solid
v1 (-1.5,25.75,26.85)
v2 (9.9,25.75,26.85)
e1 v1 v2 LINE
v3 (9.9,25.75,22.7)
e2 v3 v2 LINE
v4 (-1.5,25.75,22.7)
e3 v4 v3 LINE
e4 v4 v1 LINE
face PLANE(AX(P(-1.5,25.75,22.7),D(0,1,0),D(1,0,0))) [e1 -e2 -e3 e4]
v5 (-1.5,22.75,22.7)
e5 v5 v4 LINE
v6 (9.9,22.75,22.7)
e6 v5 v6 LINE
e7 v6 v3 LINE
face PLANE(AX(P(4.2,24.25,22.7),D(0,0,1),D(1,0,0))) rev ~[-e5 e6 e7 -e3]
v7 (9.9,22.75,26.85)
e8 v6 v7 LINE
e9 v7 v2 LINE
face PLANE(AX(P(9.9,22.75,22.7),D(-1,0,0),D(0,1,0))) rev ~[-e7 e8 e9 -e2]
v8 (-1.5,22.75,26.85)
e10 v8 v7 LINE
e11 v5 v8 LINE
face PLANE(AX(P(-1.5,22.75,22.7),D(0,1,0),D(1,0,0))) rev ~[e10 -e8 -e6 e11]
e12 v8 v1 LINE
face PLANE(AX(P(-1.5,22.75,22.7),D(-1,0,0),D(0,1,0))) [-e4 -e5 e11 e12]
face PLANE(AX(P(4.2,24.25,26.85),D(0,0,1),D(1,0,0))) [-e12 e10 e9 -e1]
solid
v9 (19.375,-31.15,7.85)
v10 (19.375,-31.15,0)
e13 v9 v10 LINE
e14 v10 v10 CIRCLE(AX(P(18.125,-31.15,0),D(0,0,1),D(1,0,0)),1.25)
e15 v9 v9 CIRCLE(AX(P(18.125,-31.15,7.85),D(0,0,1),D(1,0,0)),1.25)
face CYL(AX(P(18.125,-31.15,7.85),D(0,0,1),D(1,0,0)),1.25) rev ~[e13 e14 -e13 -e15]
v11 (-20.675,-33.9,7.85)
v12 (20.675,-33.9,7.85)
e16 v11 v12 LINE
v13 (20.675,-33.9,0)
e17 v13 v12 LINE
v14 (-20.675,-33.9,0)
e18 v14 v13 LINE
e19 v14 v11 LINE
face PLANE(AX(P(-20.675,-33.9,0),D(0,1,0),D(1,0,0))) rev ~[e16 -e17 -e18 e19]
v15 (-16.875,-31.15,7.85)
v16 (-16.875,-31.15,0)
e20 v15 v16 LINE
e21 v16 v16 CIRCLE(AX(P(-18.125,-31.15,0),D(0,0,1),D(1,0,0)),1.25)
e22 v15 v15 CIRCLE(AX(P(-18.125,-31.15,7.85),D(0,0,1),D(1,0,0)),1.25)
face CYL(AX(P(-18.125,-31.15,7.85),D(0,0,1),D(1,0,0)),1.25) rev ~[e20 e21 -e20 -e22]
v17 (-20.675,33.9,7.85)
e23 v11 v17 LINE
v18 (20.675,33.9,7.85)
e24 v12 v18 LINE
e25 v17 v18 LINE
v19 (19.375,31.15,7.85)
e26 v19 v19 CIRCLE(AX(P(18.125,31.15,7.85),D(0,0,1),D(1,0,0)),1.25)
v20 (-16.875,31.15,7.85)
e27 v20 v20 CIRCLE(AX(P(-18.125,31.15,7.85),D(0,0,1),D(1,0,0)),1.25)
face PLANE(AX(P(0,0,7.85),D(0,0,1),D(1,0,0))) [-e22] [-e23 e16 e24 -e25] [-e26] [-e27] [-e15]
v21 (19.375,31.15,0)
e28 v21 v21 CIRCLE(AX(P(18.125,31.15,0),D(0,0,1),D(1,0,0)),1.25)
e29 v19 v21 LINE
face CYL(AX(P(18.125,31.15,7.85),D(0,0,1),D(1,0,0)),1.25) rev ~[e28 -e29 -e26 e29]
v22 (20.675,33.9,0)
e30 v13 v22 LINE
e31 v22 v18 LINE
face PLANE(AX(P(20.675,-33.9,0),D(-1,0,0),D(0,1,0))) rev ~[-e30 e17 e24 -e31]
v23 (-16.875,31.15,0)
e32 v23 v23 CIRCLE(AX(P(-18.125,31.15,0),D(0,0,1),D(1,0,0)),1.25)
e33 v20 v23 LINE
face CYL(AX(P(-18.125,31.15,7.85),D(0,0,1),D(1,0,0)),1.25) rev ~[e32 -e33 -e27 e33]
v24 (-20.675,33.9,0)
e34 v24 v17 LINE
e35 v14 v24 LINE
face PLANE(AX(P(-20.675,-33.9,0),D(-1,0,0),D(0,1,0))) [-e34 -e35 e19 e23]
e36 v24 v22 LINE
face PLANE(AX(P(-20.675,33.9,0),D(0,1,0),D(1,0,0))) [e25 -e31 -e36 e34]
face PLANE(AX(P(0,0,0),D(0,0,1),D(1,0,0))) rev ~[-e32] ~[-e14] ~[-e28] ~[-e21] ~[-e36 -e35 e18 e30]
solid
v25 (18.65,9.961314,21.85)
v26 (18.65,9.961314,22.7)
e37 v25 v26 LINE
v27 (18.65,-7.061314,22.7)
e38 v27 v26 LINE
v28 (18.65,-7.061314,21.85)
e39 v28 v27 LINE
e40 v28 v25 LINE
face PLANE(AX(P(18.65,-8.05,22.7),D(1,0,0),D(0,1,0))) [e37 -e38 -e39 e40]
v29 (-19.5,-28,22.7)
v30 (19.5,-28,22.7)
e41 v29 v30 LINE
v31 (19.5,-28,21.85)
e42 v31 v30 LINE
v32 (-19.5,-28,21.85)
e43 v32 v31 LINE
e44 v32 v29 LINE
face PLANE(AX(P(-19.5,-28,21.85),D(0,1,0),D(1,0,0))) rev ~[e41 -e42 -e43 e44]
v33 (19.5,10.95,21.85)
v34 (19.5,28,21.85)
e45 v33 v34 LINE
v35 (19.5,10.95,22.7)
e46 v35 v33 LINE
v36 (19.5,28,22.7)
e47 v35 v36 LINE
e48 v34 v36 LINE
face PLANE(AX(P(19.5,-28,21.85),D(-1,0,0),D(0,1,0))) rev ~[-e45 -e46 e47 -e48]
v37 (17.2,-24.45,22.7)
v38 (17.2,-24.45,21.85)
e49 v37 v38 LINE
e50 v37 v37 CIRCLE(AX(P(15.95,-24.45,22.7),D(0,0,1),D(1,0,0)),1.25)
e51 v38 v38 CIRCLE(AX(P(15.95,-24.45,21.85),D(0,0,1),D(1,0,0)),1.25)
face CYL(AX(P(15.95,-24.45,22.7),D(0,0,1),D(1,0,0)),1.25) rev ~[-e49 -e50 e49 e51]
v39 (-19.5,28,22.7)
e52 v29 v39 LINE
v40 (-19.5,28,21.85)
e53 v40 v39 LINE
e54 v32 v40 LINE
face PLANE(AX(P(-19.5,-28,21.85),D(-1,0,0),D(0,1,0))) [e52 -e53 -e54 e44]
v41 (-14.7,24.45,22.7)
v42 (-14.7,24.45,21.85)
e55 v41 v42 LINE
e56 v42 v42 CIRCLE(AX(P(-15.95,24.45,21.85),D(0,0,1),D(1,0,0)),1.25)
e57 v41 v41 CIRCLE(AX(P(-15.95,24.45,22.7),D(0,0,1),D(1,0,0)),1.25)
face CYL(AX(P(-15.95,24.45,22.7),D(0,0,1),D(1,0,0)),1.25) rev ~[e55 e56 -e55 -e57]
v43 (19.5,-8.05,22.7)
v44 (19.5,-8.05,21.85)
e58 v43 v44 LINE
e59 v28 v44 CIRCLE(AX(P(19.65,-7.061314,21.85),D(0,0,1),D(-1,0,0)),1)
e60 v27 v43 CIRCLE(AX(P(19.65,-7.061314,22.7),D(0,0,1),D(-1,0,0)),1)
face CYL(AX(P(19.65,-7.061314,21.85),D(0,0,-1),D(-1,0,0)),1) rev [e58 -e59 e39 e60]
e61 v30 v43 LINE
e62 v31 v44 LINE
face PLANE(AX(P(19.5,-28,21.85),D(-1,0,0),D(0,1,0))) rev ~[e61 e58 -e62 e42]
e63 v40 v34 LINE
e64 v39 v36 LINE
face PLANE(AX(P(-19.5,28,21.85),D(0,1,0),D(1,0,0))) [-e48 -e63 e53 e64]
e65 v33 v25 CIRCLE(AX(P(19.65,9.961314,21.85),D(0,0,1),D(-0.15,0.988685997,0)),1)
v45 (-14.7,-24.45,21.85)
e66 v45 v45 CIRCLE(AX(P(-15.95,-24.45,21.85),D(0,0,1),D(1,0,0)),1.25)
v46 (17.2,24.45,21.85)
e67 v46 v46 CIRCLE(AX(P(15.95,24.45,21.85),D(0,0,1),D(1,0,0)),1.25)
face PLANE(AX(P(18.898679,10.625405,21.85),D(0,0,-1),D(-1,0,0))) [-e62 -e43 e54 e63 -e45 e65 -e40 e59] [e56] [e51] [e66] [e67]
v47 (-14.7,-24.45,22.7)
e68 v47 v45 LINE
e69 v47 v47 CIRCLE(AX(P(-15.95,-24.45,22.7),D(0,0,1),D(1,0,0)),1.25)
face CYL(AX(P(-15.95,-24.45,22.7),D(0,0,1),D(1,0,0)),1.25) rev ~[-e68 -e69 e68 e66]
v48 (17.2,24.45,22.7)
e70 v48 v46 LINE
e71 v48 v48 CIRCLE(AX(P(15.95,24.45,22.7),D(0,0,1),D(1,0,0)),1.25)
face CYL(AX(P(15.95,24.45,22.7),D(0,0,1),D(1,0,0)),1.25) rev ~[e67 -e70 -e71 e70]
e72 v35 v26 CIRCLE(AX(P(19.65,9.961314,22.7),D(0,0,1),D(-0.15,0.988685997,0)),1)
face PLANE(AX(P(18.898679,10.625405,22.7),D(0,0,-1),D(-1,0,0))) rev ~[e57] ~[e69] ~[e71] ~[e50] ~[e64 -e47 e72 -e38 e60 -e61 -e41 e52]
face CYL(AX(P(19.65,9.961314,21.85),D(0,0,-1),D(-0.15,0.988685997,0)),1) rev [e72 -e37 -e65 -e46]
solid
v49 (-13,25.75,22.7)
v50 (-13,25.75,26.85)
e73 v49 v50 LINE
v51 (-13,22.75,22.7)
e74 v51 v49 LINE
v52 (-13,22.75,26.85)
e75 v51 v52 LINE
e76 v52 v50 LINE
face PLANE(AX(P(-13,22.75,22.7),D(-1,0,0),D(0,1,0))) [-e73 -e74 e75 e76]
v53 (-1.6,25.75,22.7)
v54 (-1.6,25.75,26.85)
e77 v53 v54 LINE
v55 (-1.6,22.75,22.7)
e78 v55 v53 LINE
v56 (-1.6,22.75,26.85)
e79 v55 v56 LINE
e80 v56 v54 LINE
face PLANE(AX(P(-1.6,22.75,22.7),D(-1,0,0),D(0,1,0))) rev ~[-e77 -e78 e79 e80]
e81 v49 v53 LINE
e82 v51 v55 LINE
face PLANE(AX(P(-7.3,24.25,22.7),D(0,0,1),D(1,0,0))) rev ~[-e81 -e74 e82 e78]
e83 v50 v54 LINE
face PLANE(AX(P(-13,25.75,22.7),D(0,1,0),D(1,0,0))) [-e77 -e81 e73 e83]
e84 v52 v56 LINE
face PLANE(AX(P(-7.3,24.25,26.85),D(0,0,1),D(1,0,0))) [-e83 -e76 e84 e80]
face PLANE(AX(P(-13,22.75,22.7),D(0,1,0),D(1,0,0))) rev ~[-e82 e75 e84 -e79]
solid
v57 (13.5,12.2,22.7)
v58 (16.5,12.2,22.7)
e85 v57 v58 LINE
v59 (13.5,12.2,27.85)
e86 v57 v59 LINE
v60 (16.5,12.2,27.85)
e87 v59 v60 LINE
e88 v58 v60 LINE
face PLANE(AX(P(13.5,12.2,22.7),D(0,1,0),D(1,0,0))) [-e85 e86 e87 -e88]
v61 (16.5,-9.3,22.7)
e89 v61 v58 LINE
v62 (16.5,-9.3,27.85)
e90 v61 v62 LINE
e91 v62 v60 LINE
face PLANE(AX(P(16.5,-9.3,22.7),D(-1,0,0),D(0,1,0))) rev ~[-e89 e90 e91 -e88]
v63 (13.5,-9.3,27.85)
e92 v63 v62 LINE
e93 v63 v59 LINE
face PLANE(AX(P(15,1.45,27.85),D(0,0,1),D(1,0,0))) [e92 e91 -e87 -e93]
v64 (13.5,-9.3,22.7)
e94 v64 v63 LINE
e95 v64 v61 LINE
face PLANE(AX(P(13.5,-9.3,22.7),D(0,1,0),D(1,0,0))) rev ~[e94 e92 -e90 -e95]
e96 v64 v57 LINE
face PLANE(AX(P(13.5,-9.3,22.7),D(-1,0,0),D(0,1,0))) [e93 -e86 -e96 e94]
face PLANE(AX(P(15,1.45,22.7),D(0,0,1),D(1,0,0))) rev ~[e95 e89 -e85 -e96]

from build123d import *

# Parameters (mm, degrees)
F0_W         = 41.35
F0_H         = 67.8
F1_DEPTH     = 7.85
F2_R         = 1.25
F3_DEPTH     = 7.851
F5_W         = 39
F5_H         = 56
F6_DEPTH     = 0.85
F7_R         = 1.25
F8_DEPTH     = 22.701
F9_W         = 3
F9_H         = 21.5
F10_DEPTH    = 5.15
F9_W_2       = 11.4
F9_H_2       = 3
F11_DEPTH    = 4.15
F12_W        = 0.85
F12_H        = 19
F13_DEPTH    = 22.701
F14_T1_DEPTH = 0.85


# Not quite as in the source:
# - a fillet or chamfer that OpenCascade refuses, or shapes differently, is made with other operations: its cross-section is extruded or revolved along the edge and cut away or added


with BuildPart() as f1:
    # F0 (on Top) → F1 (new body)
    with BuildSketch(Plane.XY):
        Rectangle(F0_W, F0_H)
    extrude(amount=F1_DEPTH)

    # F2 (on face) → F3 (cut, through all)
    with BuildSketch(Plane.XY.offset(7.85)):
        with Locations((-18.125, -31.15)):
            Circle(F2_R)
        with Locations((-18.125, 31.15)):
            Circle(F2_R)
        with Locations((18.125, 31.15)):
            Circle(F2_R)
        with Locations((18.125, -31.15)):
            Circle(F2_R)
    extrude(amount=-F3_DEPTH, mode=Mode.SUBTRACT)


with BuildPart() as f6:
    # F5 (on offset) → F6 (new body)
    with BuildSketch(Plane.XY.offset(21.85)):
        Rectangle(F5_W, F5_H)
    extrude(amount=F6_DEPTH)

    # F7 (on face) → F8 (cut, through all)
    with BuildSketch(Plane.XY.offset(22.7)):
        with Locations((-15.95, 24.45)):
            Circle(F7_R)
        with Locations((-15.95, -24.45)):
            Circle(F7_R)
        with Locations((15.95, 24.45)):
            Circle(F7_R)
        with Locations((15.95, -24.45)):
            Circle(F7_R)
    extrude(amount=-F8_DEPTH, mode=Mode.SUBTRACT)

    # F12 (on face) → F13 (cut, through all)
    with BuildSketch(Plane.XY.offset(22.7)):
        with Locations((19.075, 1.45)):
            Rectangle(F12_W, F12_H)
    extrude(amount=-F13_DEPTH, mode=Mode.SUBTRACT)

    # F14: fillet of radius 1 on 2 edges, made by hand

    # F14_s2 → F14_t1 (join)
    with BuildSketch(Plane.XY.offset(21.85)):
        with BuildLine():
            ThreePointArc((19.5, 10.95), (18.8917124556, 10.6132342439), (18.65, 9.9613140033))
            Line((18.65, 9.9613140033), (18.65, 10.95))
            Line((18.65, 10.95), (19.5, 10.95))
        make_face()
        with BuildLine():
            ThreePointArc((18.65, -7.0613140033), (18.8917124556, -7.7132342439), (19.5, -8.05))
            Line((19.5, -8.05), (18.65, -8.05))
            Line((18.65, -8.05), (18.65, -7.0613140033))
        make_face()
    extrude(amount=F14_T1_DEPTH)


with BuildPart() as f10:
    # F9 (on face) → F10 (new body)
    with BuildSketch(Plane.XY.offset(22.7)):
        with Locations((15, 1.45)):
            Rectangle(F9_W, F9_H)
    extrude(amount=F10_DEPTH)


with BuildPart() as f11:
    # F9 (on face) → F11 (new body)
    with BuildSketch(Plane.XY.offset(22.7)):
        with Locations((-7.3, 24.25)):
            Rectangle(F9_W_2, F9_H_2)
    extrude(amount=F11_DEPTH)


with BuildPart() as f11b:
    # F9 (on face) → F11, piece 2 (new body)
    with BuildSketch(Plane.XY.offset(22.7)):
        with Locations((4.2, 24.25)):
            Rectangle(F9_W_2, F9_H_2)
    extrude(amount=F11_DEPTH)


solid = Compound([f1.part, f6.part, f10.part, f11.part, f11b.part])
